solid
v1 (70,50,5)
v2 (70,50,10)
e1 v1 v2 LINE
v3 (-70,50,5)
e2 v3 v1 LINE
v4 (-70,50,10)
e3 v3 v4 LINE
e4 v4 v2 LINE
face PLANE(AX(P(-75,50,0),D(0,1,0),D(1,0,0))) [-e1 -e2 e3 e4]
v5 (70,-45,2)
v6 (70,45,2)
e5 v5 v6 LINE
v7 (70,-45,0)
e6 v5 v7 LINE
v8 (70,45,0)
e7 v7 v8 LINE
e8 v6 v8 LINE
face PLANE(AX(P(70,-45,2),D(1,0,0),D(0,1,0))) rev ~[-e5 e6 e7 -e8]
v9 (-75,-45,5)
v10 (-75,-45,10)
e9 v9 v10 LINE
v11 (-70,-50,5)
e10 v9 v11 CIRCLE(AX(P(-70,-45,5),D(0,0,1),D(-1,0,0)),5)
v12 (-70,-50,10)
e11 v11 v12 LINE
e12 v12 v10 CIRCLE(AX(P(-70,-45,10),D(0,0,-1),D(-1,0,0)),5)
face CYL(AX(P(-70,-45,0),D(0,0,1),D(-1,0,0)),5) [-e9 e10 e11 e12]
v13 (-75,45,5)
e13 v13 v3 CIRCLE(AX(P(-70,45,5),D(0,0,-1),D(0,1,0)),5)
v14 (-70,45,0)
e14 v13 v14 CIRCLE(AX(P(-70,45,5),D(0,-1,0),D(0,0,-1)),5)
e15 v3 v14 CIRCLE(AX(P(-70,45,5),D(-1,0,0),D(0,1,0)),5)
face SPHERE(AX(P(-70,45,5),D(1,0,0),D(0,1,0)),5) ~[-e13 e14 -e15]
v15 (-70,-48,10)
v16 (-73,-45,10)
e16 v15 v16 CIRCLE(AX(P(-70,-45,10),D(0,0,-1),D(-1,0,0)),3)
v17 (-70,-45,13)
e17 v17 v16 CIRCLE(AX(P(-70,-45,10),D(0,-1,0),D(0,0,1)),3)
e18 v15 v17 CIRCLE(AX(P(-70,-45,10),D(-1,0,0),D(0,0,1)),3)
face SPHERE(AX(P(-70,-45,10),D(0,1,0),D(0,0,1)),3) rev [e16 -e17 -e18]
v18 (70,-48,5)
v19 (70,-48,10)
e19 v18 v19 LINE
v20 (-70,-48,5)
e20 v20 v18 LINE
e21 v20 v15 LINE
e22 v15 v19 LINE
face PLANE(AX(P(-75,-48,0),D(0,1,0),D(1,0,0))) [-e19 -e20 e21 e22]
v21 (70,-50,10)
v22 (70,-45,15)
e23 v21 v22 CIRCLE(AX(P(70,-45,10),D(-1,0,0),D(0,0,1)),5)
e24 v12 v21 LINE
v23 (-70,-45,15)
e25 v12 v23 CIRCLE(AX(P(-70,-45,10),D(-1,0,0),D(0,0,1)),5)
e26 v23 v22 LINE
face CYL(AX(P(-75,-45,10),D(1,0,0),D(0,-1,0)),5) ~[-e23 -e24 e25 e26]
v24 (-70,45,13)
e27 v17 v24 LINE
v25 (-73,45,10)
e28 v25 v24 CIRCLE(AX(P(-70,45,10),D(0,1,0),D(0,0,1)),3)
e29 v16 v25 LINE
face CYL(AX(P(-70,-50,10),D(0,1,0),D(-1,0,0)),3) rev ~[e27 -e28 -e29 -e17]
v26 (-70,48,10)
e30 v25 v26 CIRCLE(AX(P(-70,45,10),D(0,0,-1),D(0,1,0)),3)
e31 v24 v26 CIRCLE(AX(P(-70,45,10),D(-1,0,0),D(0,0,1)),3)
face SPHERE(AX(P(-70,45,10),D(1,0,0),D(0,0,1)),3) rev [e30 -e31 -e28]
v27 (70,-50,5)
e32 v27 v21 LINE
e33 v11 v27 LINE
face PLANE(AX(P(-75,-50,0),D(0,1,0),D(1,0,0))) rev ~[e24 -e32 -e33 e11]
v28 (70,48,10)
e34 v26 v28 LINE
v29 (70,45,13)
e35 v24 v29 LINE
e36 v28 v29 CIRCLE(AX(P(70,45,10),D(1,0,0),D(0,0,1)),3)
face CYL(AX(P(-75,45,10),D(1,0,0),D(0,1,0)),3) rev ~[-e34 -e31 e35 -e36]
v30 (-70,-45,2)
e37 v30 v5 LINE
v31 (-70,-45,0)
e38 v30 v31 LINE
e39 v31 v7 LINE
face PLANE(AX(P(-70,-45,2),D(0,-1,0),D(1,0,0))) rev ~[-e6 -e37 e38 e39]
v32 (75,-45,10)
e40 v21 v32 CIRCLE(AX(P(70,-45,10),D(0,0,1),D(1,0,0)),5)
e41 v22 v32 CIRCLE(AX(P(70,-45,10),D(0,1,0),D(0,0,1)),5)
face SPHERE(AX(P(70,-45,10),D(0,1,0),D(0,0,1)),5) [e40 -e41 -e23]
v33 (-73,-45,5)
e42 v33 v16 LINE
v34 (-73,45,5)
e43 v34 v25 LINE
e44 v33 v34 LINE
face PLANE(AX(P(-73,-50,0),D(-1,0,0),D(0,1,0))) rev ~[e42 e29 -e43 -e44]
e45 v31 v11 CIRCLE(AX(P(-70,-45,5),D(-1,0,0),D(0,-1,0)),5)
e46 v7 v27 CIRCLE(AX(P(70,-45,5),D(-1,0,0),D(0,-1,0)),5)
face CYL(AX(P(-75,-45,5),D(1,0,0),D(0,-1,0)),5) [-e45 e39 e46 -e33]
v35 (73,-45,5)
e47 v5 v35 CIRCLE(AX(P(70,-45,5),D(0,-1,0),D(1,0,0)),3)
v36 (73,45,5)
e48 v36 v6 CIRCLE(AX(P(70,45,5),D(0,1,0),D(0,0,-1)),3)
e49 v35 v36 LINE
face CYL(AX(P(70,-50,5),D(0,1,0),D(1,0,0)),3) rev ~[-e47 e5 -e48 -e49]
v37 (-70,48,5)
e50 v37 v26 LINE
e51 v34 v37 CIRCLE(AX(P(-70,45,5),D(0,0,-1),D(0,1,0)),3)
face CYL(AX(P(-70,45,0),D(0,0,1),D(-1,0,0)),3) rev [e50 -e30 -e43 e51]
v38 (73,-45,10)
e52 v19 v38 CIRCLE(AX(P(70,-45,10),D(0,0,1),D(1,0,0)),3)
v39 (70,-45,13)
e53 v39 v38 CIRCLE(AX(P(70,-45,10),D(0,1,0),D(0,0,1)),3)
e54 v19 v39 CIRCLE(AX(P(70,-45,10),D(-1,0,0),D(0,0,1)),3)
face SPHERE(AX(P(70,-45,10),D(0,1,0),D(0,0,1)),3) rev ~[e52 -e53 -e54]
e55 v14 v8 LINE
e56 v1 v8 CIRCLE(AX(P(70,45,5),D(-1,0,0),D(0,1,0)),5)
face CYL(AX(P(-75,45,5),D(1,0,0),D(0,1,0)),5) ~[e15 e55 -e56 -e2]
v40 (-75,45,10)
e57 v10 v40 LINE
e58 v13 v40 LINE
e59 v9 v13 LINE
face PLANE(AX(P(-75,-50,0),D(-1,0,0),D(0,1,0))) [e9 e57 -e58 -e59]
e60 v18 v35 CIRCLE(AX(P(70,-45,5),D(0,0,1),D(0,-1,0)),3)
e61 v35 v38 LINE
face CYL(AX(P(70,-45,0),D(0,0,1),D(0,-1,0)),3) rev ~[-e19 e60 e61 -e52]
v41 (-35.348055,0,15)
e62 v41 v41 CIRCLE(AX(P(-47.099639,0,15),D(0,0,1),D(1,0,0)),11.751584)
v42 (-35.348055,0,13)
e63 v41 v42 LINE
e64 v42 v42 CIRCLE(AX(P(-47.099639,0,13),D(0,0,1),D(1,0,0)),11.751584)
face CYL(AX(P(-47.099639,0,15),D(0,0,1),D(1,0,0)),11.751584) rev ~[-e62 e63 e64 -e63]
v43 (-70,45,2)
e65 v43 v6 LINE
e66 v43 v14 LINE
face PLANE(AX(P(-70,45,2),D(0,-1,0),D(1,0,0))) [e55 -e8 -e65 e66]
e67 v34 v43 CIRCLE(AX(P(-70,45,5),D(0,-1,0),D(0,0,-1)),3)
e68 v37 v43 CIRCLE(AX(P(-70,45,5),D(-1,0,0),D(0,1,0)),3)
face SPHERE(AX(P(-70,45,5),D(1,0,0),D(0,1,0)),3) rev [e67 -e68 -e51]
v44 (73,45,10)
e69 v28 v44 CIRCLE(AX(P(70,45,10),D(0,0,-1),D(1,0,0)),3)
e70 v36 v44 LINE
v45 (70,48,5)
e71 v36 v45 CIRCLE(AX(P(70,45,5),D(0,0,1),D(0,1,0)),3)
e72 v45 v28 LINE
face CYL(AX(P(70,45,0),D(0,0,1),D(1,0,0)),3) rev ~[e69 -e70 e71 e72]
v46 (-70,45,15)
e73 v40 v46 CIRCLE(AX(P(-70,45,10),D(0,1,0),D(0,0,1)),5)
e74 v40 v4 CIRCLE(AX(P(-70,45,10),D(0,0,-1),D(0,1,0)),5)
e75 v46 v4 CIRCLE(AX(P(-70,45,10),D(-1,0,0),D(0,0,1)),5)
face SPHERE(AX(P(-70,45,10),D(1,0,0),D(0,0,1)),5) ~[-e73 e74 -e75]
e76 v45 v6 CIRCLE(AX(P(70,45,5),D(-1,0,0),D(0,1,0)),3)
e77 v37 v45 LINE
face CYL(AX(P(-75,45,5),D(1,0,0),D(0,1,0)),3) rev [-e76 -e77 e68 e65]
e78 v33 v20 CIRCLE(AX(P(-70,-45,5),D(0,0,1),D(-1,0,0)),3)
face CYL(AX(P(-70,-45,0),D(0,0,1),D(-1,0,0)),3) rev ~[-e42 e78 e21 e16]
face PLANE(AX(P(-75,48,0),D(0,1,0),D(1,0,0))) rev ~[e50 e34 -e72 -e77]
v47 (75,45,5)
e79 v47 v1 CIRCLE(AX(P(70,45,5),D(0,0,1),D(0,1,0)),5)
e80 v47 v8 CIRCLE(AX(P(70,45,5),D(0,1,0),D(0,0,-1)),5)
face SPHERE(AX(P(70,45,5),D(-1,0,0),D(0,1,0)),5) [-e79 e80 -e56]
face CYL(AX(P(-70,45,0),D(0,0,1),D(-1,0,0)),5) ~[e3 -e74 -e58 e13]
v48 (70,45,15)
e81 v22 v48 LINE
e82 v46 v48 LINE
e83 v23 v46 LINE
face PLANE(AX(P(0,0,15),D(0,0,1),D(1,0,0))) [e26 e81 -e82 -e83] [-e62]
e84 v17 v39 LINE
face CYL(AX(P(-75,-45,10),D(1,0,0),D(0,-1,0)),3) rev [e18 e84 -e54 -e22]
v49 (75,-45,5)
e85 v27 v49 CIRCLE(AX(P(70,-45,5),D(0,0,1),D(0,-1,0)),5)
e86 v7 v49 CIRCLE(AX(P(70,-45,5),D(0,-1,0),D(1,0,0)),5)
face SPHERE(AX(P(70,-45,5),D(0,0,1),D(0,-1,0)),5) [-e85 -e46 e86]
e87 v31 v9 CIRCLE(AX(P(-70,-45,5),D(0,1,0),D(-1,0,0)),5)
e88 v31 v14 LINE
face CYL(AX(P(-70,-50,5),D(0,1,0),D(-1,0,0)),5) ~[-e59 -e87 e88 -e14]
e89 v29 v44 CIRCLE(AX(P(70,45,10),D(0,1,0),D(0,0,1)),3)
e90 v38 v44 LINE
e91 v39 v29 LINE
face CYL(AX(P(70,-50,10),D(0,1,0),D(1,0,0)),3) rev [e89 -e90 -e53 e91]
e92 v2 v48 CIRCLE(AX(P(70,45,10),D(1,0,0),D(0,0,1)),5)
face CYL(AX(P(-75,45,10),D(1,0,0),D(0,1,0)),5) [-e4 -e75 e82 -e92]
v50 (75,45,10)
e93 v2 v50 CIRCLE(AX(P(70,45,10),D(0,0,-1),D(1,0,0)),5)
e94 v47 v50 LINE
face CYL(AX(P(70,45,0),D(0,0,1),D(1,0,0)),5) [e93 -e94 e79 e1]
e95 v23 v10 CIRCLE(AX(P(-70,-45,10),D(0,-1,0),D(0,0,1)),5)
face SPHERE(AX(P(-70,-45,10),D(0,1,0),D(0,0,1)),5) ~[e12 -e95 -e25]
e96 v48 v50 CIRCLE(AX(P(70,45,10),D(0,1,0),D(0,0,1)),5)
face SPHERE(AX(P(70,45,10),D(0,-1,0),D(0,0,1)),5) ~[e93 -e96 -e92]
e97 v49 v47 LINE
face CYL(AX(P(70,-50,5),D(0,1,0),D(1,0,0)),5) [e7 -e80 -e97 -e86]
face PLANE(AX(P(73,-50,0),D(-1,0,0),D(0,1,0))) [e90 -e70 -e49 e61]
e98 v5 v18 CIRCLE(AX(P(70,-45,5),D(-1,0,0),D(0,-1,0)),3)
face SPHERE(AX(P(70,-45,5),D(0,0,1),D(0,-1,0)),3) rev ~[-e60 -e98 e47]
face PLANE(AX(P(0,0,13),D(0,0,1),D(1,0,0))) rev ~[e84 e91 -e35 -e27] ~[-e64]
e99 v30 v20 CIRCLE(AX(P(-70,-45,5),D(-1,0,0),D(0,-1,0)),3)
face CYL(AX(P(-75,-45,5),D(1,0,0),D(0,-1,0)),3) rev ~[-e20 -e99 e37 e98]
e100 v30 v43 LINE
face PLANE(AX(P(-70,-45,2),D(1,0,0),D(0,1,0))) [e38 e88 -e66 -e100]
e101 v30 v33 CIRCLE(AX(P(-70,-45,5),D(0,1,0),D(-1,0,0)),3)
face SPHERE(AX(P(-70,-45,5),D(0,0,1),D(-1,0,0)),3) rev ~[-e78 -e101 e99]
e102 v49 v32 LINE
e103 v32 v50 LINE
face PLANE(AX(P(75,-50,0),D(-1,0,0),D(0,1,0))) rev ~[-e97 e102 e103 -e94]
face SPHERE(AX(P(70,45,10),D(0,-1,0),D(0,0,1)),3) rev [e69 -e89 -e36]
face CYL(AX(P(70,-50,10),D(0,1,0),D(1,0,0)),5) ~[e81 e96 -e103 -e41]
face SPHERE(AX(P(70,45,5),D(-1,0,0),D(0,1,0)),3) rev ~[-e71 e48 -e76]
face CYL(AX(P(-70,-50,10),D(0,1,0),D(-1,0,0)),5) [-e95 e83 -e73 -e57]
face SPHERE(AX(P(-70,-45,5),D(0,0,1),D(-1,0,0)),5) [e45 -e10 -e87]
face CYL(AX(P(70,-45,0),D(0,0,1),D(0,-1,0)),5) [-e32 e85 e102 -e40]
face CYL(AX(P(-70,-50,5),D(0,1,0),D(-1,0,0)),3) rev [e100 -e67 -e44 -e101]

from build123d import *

# Parameters (mm, degrees)
F0_W     = 150
F0_H     = 100
F1_DEPTH = 15
F2_R     = 5
F3_T     = -2
F4_R     = 11.751583661
F5_DEPTH = 25


# Not quite as in the source:
# - a shell that OpenCascade refuses in one call is made with other operations: the cavity is built on its own and cut out


with BuildPart() as f1:
    # F0 (on Top) → F1 (new body)
    with BuildSketch(Plane.XY):
        Rectangle(F0_W, F0_H)
    extrude(amount=F1_DEPTH)

    # F2
    f2_edges = [f1.edges().sort_by_distance(p)[0] for p in [
        (0, 50, 0),
        (75, 0, 15),
        (0, 50, 15),
        (-75, 0, 15),
        (0, -50, 15),
        (-75, 50, 7.5),
        (-75, -50, 7.5),
        (-75, 0, 0),
        (75, -50, 7.5),
        (0, -50, 0),
        (75, 50, 7.5),
        (75, 0, 0),
    ]]
    fillet(f2_edges, radius=F2_R)

    # F3: a shell. OpenCascade refuses it in one call, so the cavity is built on its own and cut out:
    # the body offset inwards by the wall thickness, plus a prism from it out through each open face.
    f3_core = offset(f1.part, amount=F3_T, mode=Mode.PRIVATE)
    f3_exits = [f3_core.faces().sort_by_distance(p)[0] for p in [
        (0, 0, 2),
    ]]
    add(f3_core, mode=Mode.SUBTRACT)
    extrude(f3_exits, amount=-F3_T, mode=Mode.SUBTRACT)

    # F4 (on face) → F5 (cut)
    with BuildSketch(Plane.XY.offset(15)):
        with Locations((-47.0996387303, 0)):
            Circle(F4_R)
    extrude(amount=-F5_DEPTH, mode=Mode.SUBTRACT)


solid = f1.part
